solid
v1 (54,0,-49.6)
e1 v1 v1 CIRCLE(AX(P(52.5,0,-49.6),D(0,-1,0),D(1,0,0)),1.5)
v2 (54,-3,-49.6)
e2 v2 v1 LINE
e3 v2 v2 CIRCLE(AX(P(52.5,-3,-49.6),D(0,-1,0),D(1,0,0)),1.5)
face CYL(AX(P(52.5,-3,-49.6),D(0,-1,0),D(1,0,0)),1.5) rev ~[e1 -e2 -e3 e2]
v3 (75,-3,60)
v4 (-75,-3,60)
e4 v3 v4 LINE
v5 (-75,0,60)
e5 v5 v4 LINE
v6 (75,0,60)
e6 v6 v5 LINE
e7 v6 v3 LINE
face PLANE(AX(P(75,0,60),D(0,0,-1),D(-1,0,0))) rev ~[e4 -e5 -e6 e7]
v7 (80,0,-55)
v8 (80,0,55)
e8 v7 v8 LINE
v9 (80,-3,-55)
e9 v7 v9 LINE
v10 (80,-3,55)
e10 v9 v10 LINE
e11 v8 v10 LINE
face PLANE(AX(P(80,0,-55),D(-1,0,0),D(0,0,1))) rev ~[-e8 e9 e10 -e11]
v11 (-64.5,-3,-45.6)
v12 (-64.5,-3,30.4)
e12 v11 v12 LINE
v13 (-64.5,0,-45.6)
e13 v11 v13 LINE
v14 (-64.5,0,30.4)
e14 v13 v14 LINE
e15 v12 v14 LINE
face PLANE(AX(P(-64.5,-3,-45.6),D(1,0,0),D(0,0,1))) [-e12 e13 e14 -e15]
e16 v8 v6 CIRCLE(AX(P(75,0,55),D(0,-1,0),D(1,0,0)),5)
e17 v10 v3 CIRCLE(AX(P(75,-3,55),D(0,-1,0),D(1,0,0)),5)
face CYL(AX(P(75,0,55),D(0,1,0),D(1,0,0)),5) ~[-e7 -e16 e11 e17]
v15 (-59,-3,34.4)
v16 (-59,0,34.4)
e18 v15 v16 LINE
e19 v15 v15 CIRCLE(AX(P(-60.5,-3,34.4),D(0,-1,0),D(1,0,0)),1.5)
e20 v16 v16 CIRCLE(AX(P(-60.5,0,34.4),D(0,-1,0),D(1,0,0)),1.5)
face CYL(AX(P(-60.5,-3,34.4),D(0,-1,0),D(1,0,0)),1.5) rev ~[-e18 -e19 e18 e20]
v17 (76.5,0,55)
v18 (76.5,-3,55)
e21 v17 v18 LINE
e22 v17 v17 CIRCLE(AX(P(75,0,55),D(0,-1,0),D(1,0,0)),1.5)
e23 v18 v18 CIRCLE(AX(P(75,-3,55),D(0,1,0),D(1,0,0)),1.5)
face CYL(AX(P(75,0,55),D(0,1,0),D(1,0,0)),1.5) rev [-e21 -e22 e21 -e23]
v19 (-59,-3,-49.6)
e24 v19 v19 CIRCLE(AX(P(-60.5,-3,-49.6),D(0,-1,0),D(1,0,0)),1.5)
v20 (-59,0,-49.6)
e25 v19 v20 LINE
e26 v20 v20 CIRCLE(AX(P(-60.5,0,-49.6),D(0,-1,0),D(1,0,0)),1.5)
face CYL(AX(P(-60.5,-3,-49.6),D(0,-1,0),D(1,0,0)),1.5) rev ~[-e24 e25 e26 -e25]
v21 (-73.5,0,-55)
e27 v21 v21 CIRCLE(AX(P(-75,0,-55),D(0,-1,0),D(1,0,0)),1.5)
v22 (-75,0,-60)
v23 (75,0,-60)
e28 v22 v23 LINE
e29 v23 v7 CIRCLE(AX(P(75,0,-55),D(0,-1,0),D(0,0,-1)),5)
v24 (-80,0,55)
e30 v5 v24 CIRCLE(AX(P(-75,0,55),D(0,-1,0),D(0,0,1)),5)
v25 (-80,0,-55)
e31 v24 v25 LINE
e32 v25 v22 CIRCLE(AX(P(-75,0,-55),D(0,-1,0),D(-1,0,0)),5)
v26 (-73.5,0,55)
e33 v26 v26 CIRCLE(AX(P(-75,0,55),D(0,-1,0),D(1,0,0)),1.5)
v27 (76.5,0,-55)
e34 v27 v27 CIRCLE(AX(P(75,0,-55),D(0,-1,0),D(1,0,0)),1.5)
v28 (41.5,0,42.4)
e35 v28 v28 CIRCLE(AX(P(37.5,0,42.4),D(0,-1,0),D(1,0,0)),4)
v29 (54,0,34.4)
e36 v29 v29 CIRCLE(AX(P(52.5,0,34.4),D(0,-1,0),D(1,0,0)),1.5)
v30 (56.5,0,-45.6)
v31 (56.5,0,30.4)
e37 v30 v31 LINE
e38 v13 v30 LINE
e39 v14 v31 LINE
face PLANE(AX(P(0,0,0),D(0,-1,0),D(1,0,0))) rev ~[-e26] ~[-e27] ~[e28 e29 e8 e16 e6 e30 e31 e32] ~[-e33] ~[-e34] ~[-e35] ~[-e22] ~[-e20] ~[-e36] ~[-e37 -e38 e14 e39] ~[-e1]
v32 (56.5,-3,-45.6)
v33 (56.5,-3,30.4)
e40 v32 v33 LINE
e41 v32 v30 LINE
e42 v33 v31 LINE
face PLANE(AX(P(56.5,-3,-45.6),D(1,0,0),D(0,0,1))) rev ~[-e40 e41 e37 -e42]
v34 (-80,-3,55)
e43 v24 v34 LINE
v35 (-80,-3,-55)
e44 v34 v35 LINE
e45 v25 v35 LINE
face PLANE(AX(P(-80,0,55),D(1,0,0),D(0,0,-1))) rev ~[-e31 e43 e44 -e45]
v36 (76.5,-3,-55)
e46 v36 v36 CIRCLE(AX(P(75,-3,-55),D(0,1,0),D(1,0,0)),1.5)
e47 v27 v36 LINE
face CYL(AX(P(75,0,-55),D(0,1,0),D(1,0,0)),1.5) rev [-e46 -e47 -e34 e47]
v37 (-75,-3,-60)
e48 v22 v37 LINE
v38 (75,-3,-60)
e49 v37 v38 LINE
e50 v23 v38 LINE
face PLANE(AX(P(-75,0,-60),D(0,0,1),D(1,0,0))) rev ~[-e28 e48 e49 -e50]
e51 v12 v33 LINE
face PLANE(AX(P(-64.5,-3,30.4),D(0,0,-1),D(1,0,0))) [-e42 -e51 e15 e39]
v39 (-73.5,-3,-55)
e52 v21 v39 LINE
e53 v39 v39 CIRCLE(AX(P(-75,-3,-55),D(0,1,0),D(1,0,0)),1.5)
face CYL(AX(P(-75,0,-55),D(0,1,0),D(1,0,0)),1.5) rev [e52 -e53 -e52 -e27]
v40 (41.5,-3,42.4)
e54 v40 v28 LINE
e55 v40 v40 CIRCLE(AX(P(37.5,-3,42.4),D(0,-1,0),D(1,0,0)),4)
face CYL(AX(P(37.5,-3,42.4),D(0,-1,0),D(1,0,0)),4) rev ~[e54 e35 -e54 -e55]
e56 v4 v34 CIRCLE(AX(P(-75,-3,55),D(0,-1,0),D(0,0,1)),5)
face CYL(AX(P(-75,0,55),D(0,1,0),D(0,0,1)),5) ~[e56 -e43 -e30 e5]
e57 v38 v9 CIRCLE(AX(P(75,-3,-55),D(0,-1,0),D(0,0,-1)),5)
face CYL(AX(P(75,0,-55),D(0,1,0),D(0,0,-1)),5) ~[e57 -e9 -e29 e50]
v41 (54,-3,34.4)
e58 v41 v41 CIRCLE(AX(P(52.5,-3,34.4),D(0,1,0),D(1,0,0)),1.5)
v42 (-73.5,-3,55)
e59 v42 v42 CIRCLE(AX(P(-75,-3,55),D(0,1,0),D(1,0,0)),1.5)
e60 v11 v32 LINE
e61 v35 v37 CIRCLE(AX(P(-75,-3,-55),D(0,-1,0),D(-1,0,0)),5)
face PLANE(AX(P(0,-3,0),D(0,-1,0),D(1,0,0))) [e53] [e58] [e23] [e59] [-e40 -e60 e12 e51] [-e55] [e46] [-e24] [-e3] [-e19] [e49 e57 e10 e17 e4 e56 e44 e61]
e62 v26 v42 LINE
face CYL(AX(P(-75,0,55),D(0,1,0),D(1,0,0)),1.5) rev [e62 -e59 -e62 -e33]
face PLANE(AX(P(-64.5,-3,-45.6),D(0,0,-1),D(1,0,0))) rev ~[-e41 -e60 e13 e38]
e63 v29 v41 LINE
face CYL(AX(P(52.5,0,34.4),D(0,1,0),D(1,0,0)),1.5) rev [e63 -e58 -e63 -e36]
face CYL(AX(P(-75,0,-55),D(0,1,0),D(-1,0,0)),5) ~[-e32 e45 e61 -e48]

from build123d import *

# Parameters (mm, degrees)
F1_DEPTH = 3
F2_R     = 1.5
F3_DEPTH = 25
F4_R     = 1.5
F5_DEPTH = 25
F6_W     = 121
F6_H     = 76
F6_R     = 1.5
F7_DEPTH = 3
F8_R     = 4
F9_DEPTH = 3


# Not quite as in the source:
# - a feature names something its author has since deleted; it is built from what else it names


with BuildPart() as f1:
    # F0 (on Front) → F1 (new body)
    with BuildSketch(Plane.XZ):
        with BuildLine():
            Line((-75, -60), (75, -60))
            ThreePointArc((75, -60), (78.5355339059, -58.5355339059), (80, -55))
            Line((80, -55), (80, 55))
            ThreePointArc((80, 55), (78.5355339059, 58.5355339059), (75, 60))
            Line((75, 60), (-75, 60))
            ThreePointArc((-75, 60), (-78.5355339059, 58.5355339059), (-80, 55))
            Line((-80, 55), (-80, -55))
            ThreePointArc((-80, -55), (-78.5355339059, -58.5355339059), (-75, -60))
        make_face()
    extrude(amount=F1_DEPTH)

    # F2 (on Front) → F3 (cut)
    with BuildSketch(Plane.XZ):
        with Locations((-75, 55)):
            Circle(F2_R)
        with Locations((75, 55)):
            Circle(F2_R)
        with Locations((75, -55)):
            Circle(F2_R)
        with Locations((-75, -55)):
            Circle(F2_R)
    extrude(amount=F3_DEPTH, mode=Mode.SUBTRACT)

    # F4 (on Front) → F5 (cut)
    with BuildSketch(Plane.XZ):
        with Locations((52.5, 34.4)):
            Circle(F4_R)
    extrude(amount=F5_DEPTH, mode=Mode.SUBTRACT)

    # F6 (on face) → F7 (cut)
    with BuildSketch(Plane.XZ.offset(3)):
        with Locations((-4, -7.6)):
            Rectangle(F6_W, F6_H)
        with Locations((52.5, 34.4)):
            Circle(F6_R)
        with Locations((-60.5, 34.4)):
            Circle(F6_R)
        with Locations((-60.5, -49.6)):
            Circle(F6_R)
        with Locations((52.5, -49.6)):
            Circle(F6_R)
    extrude(amount=-F7_DEPTH, mode=Mode.SUBTRACT)

    # F8 (on face) → F9 (cut)
    with BuildSketch(Plane.XZ.offset(3)):
        with Locations((37.5, 42.4)):
            Circle(F8_R)
    extrude(amount=-F9_DEPTH, mode=Mode.SUBTRACT)


solid = f1.part
